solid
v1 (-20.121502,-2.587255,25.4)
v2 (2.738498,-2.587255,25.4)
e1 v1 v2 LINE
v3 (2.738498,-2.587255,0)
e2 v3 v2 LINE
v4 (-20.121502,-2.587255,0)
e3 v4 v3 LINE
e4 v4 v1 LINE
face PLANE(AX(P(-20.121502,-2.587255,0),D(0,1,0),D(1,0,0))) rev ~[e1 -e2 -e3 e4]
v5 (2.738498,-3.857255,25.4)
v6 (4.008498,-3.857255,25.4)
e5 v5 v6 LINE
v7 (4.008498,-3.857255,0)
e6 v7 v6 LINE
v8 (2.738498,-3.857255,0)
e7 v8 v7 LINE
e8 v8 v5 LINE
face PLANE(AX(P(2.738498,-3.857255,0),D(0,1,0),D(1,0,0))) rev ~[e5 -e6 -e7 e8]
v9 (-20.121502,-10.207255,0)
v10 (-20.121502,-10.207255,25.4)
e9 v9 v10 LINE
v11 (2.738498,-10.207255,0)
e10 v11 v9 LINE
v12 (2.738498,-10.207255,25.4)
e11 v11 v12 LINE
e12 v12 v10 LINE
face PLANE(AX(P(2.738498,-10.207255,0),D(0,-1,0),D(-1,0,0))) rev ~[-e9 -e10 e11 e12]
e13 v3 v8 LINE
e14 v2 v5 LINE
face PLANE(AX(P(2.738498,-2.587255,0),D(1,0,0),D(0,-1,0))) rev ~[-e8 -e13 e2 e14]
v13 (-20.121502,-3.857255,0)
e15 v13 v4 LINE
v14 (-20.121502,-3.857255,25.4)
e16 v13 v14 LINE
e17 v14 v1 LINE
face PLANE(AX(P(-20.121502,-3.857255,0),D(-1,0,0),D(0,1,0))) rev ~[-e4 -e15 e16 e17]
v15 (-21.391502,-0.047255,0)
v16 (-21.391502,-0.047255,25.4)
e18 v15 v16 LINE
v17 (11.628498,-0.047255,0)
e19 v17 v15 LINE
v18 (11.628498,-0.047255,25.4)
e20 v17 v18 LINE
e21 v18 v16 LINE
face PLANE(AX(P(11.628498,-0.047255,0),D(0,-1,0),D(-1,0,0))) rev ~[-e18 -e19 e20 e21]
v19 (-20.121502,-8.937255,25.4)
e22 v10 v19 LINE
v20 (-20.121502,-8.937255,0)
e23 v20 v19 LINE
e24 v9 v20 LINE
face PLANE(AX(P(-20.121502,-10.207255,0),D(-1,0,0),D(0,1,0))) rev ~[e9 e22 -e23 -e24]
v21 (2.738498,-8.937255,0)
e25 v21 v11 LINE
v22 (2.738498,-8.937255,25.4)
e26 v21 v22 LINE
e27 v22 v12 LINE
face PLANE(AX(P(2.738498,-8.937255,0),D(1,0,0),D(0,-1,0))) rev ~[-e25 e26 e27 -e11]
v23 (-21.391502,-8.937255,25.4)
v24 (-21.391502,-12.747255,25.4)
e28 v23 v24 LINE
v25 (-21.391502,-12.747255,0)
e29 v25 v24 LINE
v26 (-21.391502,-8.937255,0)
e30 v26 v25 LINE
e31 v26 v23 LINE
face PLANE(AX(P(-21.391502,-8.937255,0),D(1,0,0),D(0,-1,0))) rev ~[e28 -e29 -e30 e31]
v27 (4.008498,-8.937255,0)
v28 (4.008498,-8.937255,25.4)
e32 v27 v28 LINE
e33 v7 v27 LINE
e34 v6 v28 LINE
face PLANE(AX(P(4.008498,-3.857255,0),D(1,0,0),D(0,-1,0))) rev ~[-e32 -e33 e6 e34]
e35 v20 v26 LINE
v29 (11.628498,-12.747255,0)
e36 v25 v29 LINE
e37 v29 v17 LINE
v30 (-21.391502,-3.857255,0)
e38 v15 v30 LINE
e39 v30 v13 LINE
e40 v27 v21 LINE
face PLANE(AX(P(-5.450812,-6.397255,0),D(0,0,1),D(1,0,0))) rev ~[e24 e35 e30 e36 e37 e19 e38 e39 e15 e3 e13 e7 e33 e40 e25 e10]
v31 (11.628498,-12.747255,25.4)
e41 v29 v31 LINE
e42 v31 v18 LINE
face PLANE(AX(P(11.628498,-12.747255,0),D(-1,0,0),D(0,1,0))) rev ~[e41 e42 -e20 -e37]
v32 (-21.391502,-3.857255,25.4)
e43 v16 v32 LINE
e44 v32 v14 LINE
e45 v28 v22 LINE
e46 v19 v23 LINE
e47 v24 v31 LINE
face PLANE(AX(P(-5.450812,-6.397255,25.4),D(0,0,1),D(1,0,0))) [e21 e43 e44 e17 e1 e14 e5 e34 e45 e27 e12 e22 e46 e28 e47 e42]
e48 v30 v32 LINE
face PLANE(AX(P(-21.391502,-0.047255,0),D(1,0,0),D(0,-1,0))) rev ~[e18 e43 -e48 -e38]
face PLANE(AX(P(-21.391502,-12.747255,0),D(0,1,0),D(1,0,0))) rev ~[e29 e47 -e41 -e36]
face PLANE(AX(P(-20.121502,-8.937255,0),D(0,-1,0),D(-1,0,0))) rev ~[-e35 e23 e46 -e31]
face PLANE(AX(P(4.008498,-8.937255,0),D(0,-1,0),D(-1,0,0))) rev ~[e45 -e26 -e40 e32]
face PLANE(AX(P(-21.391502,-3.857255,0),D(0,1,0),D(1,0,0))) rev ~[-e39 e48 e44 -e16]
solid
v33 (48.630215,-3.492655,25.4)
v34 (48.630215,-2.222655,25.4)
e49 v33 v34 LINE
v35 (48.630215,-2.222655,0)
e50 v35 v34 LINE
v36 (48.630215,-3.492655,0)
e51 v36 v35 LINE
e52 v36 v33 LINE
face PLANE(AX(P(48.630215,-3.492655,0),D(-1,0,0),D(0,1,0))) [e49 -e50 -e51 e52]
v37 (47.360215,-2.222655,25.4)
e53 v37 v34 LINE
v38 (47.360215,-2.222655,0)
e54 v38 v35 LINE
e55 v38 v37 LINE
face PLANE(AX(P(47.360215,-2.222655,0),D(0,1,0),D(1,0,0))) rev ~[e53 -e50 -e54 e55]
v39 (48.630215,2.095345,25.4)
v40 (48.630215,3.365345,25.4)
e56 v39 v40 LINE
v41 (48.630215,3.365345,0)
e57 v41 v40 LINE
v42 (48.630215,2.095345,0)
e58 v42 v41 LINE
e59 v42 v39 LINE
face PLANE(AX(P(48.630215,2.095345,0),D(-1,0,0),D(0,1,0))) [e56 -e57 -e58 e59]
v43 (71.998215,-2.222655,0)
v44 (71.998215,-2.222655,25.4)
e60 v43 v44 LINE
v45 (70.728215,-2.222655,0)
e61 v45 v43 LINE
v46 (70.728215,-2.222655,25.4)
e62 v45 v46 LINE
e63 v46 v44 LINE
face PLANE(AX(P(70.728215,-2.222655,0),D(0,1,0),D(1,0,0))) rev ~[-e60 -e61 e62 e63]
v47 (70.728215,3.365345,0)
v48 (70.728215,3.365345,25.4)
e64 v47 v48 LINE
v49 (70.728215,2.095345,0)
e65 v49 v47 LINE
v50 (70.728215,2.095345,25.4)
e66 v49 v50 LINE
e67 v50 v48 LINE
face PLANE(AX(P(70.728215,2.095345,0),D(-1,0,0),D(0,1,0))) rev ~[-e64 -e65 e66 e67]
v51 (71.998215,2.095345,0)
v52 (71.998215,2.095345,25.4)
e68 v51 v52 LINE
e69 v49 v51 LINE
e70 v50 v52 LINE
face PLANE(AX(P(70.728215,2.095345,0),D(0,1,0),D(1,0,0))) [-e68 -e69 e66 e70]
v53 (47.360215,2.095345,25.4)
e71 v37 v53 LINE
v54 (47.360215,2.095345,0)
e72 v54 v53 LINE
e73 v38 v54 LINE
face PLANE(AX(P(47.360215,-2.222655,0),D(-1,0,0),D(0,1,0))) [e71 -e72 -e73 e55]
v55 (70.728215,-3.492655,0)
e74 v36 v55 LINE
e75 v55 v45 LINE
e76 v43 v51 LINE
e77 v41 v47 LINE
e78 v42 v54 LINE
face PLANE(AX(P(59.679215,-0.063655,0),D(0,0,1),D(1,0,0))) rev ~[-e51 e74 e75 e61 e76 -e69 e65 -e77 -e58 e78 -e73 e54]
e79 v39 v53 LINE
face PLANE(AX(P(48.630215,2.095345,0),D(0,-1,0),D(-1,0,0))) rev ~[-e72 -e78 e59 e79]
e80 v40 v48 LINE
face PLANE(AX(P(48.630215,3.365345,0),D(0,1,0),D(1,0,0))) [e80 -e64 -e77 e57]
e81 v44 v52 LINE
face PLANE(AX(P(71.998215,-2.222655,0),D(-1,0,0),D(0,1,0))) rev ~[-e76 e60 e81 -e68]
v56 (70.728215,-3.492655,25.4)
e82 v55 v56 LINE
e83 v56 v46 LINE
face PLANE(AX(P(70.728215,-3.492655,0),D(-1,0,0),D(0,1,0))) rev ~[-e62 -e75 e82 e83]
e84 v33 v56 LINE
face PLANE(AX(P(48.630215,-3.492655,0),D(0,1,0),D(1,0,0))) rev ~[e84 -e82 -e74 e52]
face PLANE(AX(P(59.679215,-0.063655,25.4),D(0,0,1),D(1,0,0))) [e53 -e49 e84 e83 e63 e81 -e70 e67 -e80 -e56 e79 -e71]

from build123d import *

# Parameters (mm, degrees)
F1_DEPTH = 25.4
F0_W     = 22.098
F0_H     = 4.318
F0_W_2   = 1.27
F0_H_2   = 1.27


# Not quite as in the source:
# - a feature names something its author has since deleted; it is built from what else it names


with BuildPart() as f1:
    # F0 (on Top) → F1 (new body)
    with BuildSketch(Plane.XY):
        Polygon((-20.1215016502, -3.8572545798), (-20.1215016502, -2.5872545798), (2.7384983498, -2.5872545798), (2.7384983498, -3.8572545798), (4.0084983498, -3.8572545798), (4.0084983498, -8.9372545798), (2.7384983498, -8.9372545798), (2.7384983498, -10.2072545798), (-20.1215016502, -10.2072545798), (-20.1215016502, -8.9372545798), (-21.3915016502, -8.9372545798), (-21.3915016502, -12.7472545798), (11.6284983498, -12.7472545798), (11.6284983498, -0.0472545798), (-21.3915016502, -0.0472545798), (-21.3915016502, -3.8572545798), align=None)
    extrude(amount=F1_DEPTH)


with BuildPart() as f1b:
    # F0 (on Top) → F1, piece 2 (new body)
    with BuildSketch(Plane.XY):
        with Locations((59.6792152276, -0.0636551082)):
            Rectangle(F0_W, F0_H)
        with Locations((47.9952152276, -0.0636551082)):
            Rectangle(F0_W_2, F0_H)
        with Locations((59.6792152276, -2.8576551082)):
            Rectangle(F0_W, F0_H_2)
        with Locations((59.6792152276, 2.7303448918)):
            Rectangle(F0_W, F0_H_2)
        with Locations((71.3632152276, -0.0636551082)):
            Rectangle(F0_W_2, F0_H)
    extrude(amount=F1_DEPTH)


solid = Compound([f1.part, f1b.part])
